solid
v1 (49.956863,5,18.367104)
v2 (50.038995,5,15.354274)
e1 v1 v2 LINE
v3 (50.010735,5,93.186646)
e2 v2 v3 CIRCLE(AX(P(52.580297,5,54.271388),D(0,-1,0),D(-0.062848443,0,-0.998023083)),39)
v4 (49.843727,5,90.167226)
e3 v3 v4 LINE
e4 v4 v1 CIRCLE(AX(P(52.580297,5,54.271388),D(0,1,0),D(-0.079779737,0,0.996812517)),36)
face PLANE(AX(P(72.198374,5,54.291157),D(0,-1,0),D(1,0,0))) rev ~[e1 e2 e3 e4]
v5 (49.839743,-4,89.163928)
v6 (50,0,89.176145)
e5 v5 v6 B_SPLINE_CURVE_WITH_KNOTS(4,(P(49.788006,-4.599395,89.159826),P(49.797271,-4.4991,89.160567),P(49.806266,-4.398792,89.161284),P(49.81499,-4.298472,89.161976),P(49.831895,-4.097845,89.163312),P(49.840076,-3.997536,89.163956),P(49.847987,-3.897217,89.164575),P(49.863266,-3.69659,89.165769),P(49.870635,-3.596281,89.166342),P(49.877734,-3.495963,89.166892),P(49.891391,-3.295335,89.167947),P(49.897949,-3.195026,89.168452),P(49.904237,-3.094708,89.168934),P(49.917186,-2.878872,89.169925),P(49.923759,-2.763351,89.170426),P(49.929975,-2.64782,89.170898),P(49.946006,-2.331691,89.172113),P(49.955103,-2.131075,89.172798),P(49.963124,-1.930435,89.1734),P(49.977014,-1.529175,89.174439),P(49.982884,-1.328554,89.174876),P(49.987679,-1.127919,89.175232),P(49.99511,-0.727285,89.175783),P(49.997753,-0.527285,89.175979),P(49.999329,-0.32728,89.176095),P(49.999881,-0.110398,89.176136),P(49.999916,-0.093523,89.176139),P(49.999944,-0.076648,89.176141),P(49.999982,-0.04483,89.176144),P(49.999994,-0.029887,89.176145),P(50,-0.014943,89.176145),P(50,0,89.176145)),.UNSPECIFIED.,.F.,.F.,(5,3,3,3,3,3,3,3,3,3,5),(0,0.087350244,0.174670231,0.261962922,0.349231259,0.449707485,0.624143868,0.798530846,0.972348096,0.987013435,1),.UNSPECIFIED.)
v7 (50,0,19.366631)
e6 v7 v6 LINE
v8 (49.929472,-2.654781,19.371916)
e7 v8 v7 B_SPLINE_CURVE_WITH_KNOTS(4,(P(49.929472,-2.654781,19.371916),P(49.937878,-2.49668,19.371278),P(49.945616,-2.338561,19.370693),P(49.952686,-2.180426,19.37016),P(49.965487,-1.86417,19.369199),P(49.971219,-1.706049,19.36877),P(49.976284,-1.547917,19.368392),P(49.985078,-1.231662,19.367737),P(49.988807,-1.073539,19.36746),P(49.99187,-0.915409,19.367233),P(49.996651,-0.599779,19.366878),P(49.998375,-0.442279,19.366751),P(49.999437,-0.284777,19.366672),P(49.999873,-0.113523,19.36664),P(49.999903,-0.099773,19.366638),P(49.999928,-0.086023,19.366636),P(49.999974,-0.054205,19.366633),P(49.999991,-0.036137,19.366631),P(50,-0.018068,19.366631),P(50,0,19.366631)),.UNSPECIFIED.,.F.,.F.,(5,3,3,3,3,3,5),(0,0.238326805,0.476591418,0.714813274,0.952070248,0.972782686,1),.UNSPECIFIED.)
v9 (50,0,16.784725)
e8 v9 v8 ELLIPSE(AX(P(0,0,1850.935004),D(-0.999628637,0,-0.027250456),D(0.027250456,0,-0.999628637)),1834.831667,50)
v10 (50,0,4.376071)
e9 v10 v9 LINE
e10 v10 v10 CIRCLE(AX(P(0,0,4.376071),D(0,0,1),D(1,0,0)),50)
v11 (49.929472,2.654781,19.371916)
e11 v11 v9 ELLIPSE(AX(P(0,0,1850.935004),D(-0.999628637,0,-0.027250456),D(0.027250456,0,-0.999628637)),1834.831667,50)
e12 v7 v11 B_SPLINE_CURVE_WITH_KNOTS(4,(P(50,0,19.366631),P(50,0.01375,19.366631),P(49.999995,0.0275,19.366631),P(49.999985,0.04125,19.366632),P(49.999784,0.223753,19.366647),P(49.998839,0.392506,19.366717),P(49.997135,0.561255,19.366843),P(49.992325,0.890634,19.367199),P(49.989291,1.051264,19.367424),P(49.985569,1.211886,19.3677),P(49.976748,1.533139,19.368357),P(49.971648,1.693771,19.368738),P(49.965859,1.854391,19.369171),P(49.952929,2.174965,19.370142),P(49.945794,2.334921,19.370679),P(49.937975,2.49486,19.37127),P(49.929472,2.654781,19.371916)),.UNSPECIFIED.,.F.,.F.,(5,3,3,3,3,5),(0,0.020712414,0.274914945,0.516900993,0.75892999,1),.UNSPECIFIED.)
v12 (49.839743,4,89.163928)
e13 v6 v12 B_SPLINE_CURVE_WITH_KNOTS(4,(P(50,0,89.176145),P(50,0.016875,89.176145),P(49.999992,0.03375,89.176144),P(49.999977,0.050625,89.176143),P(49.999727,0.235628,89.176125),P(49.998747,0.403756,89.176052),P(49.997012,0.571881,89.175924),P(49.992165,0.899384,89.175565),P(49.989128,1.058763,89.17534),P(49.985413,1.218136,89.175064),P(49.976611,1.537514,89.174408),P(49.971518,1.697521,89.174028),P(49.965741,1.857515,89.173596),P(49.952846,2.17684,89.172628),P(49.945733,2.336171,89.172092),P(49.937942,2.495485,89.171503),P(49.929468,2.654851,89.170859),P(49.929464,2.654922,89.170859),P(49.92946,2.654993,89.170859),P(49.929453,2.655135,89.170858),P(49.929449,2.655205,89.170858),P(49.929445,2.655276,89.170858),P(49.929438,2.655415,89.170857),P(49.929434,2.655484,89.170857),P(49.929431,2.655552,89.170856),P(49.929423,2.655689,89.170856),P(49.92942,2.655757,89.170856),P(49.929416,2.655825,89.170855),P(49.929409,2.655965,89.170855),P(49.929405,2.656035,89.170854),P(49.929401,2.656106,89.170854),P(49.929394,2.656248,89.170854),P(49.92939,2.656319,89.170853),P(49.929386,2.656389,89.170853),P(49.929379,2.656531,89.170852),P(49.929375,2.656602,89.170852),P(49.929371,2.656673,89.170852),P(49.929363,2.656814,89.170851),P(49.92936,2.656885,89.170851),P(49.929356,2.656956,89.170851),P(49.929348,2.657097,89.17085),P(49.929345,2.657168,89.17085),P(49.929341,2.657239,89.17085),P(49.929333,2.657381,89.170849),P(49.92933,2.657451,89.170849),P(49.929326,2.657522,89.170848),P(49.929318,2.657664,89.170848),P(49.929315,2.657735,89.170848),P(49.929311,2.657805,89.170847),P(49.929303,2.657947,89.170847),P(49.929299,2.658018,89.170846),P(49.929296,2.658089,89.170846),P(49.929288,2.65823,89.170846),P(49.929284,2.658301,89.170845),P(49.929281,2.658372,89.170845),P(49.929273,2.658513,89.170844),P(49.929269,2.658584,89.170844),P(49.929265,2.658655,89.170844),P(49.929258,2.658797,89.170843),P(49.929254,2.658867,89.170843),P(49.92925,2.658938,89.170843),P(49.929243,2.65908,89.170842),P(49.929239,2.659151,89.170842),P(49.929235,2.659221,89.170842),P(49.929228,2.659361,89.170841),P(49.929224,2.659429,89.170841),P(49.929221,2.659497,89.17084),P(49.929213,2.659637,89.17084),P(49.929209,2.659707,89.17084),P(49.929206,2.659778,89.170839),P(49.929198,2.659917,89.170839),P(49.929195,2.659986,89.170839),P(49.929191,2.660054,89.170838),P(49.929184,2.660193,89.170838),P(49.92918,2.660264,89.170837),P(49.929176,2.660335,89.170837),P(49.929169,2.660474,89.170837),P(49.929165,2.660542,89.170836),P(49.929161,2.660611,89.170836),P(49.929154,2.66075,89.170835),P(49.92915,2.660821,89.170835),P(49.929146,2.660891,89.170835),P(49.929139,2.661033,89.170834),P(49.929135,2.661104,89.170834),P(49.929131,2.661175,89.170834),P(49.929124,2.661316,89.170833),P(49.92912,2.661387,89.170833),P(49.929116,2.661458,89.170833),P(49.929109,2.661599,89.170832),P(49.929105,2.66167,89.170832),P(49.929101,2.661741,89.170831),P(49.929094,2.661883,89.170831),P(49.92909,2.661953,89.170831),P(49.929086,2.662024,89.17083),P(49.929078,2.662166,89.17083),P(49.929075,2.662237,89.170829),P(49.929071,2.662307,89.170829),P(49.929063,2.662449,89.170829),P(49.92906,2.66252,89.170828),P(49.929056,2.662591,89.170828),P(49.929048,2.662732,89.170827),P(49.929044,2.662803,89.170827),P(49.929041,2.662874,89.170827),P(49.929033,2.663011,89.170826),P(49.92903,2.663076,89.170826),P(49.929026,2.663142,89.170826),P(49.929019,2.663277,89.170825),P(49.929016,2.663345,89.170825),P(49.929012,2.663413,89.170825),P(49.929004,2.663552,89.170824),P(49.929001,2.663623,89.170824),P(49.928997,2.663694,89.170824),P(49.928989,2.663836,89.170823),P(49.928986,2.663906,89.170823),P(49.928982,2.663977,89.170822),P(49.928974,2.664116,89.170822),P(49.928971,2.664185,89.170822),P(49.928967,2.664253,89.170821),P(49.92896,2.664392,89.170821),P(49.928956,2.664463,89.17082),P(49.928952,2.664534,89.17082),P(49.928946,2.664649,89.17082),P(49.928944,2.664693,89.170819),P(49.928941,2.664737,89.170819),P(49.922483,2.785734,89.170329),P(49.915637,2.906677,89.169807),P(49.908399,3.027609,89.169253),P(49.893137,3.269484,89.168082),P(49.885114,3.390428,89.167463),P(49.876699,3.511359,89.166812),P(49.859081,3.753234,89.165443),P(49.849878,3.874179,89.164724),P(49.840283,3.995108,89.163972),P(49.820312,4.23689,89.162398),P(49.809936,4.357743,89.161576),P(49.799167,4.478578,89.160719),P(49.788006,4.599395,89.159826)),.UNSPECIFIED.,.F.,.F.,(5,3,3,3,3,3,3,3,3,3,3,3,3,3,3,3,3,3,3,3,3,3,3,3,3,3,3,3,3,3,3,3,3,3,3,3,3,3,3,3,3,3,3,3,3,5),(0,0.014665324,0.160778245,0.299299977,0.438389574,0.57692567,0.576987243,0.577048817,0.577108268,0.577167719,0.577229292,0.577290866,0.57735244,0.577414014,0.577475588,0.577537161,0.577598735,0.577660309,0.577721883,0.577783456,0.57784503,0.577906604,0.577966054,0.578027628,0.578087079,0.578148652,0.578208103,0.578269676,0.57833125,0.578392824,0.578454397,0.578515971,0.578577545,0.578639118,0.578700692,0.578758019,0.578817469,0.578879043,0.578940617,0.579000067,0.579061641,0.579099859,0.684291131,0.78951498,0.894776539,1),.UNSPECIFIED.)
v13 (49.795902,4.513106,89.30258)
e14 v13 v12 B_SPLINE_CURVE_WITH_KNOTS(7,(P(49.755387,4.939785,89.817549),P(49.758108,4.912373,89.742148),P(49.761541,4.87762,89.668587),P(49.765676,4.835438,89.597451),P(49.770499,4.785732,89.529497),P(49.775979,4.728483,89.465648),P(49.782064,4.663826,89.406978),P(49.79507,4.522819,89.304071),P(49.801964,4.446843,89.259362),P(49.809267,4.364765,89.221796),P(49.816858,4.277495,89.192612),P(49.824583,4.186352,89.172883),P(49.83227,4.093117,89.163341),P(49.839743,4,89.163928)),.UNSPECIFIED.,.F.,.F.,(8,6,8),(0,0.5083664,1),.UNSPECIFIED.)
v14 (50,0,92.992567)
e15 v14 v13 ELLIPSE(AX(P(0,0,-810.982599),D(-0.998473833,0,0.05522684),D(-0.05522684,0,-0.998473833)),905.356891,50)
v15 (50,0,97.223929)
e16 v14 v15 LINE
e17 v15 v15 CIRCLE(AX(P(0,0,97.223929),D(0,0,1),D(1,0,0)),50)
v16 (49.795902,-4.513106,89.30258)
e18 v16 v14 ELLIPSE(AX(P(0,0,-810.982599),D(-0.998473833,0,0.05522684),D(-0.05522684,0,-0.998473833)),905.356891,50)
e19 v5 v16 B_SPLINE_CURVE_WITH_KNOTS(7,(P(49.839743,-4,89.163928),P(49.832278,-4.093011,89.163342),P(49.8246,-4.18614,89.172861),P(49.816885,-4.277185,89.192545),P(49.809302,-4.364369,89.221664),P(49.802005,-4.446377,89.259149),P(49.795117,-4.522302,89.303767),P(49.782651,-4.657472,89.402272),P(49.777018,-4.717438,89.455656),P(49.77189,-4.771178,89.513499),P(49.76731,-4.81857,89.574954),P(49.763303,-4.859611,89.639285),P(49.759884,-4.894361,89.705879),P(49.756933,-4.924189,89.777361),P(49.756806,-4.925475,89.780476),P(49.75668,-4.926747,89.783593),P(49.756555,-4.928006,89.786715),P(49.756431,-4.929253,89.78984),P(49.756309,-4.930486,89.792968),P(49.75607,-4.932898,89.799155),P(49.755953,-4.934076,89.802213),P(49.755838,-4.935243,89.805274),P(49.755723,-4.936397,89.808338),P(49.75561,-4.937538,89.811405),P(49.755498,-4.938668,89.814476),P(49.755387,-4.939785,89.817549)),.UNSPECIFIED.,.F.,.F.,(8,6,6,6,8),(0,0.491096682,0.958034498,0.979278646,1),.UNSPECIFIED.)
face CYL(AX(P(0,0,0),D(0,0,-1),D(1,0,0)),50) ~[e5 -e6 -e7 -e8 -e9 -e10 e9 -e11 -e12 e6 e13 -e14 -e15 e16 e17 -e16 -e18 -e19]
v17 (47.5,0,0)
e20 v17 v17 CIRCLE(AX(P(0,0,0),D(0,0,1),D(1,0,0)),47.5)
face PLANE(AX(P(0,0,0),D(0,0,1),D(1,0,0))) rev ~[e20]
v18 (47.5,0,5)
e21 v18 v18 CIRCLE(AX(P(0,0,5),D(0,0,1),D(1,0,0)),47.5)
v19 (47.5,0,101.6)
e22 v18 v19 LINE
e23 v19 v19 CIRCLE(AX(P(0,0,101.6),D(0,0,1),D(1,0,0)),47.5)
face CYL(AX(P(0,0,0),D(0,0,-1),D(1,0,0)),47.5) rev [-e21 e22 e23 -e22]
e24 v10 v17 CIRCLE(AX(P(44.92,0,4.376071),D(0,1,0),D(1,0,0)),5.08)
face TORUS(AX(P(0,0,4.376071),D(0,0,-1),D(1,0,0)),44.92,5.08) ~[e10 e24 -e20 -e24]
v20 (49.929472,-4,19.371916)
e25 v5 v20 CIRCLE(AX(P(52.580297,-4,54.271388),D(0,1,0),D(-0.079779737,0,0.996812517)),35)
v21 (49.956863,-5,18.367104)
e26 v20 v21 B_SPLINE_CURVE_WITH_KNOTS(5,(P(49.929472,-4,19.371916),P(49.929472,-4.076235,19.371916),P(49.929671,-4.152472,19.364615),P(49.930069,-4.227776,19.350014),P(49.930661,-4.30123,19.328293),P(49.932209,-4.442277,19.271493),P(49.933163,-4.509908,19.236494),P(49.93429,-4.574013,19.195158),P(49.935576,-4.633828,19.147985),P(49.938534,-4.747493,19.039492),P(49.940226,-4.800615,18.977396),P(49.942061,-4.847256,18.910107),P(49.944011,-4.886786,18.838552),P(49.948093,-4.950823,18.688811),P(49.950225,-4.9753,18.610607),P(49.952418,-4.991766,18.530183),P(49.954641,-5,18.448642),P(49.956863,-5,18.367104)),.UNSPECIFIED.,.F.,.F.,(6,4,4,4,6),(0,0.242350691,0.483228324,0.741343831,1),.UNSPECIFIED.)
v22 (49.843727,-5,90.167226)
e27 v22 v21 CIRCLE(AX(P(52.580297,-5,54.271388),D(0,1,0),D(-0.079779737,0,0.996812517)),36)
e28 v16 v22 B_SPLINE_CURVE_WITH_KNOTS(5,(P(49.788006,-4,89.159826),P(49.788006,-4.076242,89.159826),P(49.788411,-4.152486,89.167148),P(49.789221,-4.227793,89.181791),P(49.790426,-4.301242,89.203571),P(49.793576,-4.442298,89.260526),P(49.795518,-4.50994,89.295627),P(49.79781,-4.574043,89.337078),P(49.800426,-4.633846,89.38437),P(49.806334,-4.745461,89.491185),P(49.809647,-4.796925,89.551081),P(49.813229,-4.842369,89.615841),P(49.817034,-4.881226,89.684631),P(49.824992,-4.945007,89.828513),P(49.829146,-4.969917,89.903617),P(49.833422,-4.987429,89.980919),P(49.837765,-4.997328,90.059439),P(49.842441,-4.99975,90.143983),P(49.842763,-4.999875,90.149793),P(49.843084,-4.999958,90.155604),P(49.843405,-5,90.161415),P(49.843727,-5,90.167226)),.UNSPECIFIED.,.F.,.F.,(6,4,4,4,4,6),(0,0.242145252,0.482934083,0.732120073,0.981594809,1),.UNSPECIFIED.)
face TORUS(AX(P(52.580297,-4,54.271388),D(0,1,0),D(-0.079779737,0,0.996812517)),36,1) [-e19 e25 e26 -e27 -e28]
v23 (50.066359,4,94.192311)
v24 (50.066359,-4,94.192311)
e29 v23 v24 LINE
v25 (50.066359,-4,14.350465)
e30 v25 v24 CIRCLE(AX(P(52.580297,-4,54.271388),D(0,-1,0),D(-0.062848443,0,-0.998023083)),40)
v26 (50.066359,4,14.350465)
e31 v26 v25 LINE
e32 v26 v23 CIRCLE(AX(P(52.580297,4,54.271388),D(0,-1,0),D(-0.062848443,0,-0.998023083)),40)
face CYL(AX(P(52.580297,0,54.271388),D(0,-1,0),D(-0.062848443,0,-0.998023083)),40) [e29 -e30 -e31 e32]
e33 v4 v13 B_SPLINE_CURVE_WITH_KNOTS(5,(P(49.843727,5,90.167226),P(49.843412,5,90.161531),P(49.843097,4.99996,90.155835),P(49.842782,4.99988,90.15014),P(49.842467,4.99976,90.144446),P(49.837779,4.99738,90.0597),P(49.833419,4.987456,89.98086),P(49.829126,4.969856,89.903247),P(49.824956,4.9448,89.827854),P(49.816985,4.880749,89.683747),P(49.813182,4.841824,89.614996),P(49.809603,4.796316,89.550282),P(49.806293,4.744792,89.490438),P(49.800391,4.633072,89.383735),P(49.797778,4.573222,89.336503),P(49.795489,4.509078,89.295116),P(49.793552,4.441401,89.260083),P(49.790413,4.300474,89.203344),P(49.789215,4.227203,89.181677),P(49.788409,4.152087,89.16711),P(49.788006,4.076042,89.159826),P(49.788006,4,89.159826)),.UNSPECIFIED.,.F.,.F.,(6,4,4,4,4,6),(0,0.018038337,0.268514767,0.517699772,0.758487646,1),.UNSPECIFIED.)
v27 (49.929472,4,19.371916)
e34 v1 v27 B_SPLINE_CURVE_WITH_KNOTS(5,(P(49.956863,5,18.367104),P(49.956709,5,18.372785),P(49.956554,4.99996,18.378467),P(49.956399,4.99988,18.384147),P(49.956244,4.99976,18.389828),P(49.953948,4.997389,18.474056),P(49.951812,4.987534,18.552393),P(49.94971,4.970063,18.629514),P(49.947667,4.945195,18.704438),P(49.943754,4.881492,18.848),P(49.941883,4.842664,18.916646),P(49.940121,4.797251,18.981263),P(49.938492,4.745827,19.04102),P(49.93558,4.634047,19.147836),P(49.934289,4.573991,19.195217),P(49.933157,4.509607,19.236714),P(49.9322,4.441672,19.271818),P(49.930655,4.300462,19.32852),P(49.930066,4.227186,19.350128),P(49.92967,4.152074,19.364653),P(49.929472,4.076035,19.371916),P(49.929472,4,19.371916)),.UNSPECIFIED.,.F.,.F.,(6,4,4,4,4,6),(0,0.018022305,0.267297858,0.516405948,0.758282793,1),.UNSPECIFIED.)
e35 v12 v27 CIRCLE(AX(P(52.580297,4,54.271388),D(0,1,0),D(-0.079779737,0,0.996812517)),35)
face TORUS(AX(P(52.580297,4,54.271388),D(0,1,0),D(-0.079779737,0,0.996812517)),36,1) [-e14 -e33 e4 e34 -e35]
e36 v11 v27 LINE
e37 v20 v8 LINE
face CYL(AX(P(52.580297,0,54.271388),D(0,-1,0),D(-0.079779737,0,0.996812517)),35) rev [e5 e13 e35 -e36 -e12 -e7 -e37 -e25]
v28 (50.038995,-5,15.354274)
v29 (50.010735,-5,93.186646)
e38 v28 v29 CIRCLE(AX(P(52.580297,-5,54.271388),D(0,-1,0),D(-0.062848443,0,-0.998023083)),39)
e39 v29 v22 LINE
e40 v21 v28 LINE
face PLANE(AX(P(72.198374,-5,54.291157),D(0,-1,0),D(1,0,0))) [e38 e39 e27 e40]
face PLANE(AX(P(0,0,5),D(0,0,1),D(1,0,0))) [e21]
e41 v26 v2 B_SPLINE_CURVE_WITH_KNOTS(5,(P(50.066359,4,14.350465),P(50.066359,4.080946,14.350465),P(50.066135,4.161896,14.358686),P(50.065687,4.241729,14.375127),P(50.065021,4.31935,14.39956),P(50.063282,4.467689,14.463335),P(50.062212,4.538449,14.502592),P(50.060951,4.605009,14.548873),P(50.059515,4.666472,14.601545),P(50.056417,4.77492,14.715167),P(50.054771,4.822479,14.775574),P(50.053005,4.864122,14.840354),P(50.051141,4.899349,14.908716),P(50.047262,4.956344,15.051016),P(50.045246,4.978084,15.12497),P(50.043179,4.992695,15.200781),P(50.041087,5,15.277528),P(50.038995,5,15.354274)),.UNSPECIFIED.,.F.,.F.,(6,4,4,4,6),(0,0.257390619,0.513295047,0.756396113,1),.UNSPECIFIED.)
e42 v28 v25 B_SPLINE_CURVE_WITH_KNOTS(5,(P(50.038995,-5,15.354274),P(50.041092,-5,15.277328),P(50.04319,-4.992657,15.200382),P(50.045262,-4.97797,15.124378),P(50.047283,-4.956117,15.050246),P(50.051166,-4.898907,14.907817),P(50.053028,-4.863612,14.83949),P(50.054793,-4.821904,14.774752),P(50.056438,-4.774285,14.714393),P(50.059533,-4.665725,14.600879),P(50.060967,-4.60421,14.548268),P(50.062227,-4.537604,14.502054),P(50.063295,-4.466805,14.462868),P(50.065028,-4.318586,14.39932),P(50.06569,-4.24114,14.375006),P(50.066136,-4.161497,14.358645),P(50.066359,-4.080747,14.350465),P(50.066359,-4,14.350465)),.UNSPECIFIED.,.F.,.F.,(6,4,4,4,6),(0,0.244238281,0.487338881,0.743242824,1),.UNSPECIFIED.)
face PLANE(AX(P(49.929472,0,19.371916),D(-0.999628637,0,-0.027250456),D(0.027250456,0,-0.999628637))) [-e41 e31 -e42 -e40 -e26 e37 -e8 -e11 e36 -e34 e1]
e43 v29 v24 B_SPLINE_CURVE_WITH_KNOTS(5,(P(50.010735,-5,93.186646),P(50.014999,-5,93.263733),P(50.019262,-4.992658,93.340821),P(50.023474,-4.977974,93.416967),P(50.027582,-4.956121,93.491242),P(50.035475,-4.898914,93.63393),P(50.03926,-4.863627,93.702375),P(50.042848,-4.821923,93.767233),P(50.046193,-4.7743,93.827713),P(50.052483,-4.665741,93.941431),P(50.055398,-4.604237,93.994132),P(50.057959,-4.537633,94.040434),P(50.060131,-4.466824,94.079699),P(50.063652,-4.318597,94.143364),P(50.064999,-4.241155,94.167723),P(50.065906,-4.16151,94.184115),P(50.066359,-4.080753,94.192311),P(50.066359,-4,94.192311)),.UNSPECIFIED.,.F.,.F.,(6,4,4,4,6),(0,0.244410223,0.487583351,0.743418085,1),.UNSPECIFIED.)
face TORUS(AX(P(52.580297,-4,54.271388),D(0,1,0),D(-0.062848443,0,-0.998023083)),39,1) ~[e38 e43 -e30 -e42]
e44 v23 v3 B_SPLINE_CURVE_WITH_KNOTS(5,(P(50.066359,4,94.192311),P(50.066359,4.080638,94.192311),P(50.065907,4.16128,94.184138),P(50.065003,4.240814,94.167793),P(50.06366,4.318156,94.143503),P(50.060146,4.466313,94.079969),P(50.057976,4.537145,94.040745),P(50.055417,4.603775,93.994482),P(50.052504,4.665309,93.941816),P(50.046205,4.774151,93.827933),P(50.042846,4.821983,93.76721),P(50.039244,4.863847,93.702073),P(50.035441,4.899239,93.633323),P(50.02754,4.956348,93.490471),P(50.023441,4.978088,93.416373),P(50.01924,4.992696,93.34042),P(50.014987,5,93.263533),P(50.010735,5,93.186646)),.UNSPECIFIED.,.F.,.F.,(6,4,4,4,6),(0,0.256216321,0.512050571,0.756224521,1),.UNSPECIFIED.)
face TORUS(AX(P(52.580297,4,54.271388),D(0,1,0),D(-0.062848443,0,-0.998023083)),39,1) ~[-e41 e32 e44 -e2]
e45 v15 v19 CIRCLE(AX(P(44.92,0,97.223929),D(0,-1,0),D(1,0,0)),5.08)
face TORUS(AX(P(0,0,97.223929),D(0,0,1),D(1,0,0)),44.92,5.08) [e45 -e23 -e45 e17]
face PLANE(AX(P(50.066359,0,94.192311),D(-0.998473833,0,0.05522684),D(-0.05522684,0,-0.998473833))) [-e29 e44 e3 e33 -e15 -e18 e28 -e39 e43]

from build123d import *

# Parameters (mm, degrees)
F0_R     = 50
F0_R_2   = 47.5
F1_DEPTH = 101.6
F4_DEPTH = 5
F6_DEPTH = 5
F7_F1_R  = 1
F7_F2_R  = 1
F7_F3_R  = 1
F7_F4_R  = 1


# Not quite as in the source:
# - a fillet or chamfer that OpenCascade refuses, or shapes differently, is made with other operations: its cross-section is extruded or revolved along the edge and cut away or added


with BuildPart() as f1:
    # F0 (on Top) → F1 (new body)
    with BuildSketch(Plane.XY):
        Circle(F0_R)
        Circle(F0_R_2, mode=Mode.SUBTRACT)
    extrude(amount=F1_DEPTH)

    # F2: fillet of radius 5.08 on 1 edges, made by hand

    # F2_s1 → F2_t2 (revolve, cut)
    with BuildSketch(Plane.XZ):
        with BuildLine():
            ThreePointArc((50, 97.2239287026), (49.3309409427, 99.7438493363), (47.5, 101.6))
            Line((47.5, 101.6), (50, 101.6))
            Line((50, 101.6), (50, 97.2239287026))
        make_face()
    revolve(axis=Axis((0, 0, 101.6), (0, 0, 1)), mode=Mode.SUBTRACT)

    # F3: fillet of radius 5.08 on 1 edges, made by hand

    # F3_s1 → F3_t2 (revolve, cut)
    with BuildSketch(Plane.XZ):
        with BuildLine():
            ThreePointArc((50, 4.3760712974), (49.3309409427, 1.8561506637), (47.5, 0))
            Line((47.5, 0), (50, 0))
            Line((50, 0), (50, 4.3760712974))
        make_face()
    revolve(axis=Axis((0, 0, 0), (0, 0, 1)), mode=Mode.SUBTRACT)

    # F0 (on Top) → F4 (join)
    with BuildSketch(Plane.XY):
        Circle(F0_R_2)
    extrude(amount=F4_DEPTH)

    # F5 (on Front) → F6 (join, symmetric)
    with BuildSketch(Plane.XZ):
        with BuildLine():
            Line((49.9294716591, 19.3719161714), (50.0663593411, 14.3504645675))
            ThreePointArc((50.0663593411, 14.3504645675), (92.5802970628, 54.2713878676), (50.0663593411, 94.1923111677))
            Line((50.0663593411, 94.1923111677), (49.7880062733, 89.1598259546))
            ThreePointArc((49.7880062733, 89.1598259546), (87.5802251549, 54.3423353762), (49.9294716591, 19.3719161714))
        make_face()
    extrude(amount=F6_DEPTH, both=True)

    # F7: fillet of radius 1 on 4 edges, made by hand

    # F7_f1
    f7_f1_edges = [f1.edges().sort_by_distance(p)[0] for p in [
        (87.5802251549, -5, 54.3423353762),
    ]]
    fillet(f7_f1_edges, radius=F7_F1_R)

    # F7_f2
    f7_f2_edges = [f1.edges().sort_by_distance(p)[0] for p in [
        (92.5802970628, -5, 54.2713878676),
    ]]
    fillet(f7_f2_edges, radius=F7_F2_R)

    # F7_f3
    f7_f3_edges = [f1.edges().sort_by_distance(p)[0] for p in [
        (92.5802970628, 5, 54.2713878676),
    ]]
    fillet(f7_f3_edges, radius=F7_F3_R)

    # F7_f4
    f7_f4_edges = [f1.edges().sort_by_distance(p)[0] for p in [
        (87.5802251549, 5, 54.3423353762),
    ]]
    fillet(f7_f4_edges, radius=F7_F4_R)


solid = f1.part
